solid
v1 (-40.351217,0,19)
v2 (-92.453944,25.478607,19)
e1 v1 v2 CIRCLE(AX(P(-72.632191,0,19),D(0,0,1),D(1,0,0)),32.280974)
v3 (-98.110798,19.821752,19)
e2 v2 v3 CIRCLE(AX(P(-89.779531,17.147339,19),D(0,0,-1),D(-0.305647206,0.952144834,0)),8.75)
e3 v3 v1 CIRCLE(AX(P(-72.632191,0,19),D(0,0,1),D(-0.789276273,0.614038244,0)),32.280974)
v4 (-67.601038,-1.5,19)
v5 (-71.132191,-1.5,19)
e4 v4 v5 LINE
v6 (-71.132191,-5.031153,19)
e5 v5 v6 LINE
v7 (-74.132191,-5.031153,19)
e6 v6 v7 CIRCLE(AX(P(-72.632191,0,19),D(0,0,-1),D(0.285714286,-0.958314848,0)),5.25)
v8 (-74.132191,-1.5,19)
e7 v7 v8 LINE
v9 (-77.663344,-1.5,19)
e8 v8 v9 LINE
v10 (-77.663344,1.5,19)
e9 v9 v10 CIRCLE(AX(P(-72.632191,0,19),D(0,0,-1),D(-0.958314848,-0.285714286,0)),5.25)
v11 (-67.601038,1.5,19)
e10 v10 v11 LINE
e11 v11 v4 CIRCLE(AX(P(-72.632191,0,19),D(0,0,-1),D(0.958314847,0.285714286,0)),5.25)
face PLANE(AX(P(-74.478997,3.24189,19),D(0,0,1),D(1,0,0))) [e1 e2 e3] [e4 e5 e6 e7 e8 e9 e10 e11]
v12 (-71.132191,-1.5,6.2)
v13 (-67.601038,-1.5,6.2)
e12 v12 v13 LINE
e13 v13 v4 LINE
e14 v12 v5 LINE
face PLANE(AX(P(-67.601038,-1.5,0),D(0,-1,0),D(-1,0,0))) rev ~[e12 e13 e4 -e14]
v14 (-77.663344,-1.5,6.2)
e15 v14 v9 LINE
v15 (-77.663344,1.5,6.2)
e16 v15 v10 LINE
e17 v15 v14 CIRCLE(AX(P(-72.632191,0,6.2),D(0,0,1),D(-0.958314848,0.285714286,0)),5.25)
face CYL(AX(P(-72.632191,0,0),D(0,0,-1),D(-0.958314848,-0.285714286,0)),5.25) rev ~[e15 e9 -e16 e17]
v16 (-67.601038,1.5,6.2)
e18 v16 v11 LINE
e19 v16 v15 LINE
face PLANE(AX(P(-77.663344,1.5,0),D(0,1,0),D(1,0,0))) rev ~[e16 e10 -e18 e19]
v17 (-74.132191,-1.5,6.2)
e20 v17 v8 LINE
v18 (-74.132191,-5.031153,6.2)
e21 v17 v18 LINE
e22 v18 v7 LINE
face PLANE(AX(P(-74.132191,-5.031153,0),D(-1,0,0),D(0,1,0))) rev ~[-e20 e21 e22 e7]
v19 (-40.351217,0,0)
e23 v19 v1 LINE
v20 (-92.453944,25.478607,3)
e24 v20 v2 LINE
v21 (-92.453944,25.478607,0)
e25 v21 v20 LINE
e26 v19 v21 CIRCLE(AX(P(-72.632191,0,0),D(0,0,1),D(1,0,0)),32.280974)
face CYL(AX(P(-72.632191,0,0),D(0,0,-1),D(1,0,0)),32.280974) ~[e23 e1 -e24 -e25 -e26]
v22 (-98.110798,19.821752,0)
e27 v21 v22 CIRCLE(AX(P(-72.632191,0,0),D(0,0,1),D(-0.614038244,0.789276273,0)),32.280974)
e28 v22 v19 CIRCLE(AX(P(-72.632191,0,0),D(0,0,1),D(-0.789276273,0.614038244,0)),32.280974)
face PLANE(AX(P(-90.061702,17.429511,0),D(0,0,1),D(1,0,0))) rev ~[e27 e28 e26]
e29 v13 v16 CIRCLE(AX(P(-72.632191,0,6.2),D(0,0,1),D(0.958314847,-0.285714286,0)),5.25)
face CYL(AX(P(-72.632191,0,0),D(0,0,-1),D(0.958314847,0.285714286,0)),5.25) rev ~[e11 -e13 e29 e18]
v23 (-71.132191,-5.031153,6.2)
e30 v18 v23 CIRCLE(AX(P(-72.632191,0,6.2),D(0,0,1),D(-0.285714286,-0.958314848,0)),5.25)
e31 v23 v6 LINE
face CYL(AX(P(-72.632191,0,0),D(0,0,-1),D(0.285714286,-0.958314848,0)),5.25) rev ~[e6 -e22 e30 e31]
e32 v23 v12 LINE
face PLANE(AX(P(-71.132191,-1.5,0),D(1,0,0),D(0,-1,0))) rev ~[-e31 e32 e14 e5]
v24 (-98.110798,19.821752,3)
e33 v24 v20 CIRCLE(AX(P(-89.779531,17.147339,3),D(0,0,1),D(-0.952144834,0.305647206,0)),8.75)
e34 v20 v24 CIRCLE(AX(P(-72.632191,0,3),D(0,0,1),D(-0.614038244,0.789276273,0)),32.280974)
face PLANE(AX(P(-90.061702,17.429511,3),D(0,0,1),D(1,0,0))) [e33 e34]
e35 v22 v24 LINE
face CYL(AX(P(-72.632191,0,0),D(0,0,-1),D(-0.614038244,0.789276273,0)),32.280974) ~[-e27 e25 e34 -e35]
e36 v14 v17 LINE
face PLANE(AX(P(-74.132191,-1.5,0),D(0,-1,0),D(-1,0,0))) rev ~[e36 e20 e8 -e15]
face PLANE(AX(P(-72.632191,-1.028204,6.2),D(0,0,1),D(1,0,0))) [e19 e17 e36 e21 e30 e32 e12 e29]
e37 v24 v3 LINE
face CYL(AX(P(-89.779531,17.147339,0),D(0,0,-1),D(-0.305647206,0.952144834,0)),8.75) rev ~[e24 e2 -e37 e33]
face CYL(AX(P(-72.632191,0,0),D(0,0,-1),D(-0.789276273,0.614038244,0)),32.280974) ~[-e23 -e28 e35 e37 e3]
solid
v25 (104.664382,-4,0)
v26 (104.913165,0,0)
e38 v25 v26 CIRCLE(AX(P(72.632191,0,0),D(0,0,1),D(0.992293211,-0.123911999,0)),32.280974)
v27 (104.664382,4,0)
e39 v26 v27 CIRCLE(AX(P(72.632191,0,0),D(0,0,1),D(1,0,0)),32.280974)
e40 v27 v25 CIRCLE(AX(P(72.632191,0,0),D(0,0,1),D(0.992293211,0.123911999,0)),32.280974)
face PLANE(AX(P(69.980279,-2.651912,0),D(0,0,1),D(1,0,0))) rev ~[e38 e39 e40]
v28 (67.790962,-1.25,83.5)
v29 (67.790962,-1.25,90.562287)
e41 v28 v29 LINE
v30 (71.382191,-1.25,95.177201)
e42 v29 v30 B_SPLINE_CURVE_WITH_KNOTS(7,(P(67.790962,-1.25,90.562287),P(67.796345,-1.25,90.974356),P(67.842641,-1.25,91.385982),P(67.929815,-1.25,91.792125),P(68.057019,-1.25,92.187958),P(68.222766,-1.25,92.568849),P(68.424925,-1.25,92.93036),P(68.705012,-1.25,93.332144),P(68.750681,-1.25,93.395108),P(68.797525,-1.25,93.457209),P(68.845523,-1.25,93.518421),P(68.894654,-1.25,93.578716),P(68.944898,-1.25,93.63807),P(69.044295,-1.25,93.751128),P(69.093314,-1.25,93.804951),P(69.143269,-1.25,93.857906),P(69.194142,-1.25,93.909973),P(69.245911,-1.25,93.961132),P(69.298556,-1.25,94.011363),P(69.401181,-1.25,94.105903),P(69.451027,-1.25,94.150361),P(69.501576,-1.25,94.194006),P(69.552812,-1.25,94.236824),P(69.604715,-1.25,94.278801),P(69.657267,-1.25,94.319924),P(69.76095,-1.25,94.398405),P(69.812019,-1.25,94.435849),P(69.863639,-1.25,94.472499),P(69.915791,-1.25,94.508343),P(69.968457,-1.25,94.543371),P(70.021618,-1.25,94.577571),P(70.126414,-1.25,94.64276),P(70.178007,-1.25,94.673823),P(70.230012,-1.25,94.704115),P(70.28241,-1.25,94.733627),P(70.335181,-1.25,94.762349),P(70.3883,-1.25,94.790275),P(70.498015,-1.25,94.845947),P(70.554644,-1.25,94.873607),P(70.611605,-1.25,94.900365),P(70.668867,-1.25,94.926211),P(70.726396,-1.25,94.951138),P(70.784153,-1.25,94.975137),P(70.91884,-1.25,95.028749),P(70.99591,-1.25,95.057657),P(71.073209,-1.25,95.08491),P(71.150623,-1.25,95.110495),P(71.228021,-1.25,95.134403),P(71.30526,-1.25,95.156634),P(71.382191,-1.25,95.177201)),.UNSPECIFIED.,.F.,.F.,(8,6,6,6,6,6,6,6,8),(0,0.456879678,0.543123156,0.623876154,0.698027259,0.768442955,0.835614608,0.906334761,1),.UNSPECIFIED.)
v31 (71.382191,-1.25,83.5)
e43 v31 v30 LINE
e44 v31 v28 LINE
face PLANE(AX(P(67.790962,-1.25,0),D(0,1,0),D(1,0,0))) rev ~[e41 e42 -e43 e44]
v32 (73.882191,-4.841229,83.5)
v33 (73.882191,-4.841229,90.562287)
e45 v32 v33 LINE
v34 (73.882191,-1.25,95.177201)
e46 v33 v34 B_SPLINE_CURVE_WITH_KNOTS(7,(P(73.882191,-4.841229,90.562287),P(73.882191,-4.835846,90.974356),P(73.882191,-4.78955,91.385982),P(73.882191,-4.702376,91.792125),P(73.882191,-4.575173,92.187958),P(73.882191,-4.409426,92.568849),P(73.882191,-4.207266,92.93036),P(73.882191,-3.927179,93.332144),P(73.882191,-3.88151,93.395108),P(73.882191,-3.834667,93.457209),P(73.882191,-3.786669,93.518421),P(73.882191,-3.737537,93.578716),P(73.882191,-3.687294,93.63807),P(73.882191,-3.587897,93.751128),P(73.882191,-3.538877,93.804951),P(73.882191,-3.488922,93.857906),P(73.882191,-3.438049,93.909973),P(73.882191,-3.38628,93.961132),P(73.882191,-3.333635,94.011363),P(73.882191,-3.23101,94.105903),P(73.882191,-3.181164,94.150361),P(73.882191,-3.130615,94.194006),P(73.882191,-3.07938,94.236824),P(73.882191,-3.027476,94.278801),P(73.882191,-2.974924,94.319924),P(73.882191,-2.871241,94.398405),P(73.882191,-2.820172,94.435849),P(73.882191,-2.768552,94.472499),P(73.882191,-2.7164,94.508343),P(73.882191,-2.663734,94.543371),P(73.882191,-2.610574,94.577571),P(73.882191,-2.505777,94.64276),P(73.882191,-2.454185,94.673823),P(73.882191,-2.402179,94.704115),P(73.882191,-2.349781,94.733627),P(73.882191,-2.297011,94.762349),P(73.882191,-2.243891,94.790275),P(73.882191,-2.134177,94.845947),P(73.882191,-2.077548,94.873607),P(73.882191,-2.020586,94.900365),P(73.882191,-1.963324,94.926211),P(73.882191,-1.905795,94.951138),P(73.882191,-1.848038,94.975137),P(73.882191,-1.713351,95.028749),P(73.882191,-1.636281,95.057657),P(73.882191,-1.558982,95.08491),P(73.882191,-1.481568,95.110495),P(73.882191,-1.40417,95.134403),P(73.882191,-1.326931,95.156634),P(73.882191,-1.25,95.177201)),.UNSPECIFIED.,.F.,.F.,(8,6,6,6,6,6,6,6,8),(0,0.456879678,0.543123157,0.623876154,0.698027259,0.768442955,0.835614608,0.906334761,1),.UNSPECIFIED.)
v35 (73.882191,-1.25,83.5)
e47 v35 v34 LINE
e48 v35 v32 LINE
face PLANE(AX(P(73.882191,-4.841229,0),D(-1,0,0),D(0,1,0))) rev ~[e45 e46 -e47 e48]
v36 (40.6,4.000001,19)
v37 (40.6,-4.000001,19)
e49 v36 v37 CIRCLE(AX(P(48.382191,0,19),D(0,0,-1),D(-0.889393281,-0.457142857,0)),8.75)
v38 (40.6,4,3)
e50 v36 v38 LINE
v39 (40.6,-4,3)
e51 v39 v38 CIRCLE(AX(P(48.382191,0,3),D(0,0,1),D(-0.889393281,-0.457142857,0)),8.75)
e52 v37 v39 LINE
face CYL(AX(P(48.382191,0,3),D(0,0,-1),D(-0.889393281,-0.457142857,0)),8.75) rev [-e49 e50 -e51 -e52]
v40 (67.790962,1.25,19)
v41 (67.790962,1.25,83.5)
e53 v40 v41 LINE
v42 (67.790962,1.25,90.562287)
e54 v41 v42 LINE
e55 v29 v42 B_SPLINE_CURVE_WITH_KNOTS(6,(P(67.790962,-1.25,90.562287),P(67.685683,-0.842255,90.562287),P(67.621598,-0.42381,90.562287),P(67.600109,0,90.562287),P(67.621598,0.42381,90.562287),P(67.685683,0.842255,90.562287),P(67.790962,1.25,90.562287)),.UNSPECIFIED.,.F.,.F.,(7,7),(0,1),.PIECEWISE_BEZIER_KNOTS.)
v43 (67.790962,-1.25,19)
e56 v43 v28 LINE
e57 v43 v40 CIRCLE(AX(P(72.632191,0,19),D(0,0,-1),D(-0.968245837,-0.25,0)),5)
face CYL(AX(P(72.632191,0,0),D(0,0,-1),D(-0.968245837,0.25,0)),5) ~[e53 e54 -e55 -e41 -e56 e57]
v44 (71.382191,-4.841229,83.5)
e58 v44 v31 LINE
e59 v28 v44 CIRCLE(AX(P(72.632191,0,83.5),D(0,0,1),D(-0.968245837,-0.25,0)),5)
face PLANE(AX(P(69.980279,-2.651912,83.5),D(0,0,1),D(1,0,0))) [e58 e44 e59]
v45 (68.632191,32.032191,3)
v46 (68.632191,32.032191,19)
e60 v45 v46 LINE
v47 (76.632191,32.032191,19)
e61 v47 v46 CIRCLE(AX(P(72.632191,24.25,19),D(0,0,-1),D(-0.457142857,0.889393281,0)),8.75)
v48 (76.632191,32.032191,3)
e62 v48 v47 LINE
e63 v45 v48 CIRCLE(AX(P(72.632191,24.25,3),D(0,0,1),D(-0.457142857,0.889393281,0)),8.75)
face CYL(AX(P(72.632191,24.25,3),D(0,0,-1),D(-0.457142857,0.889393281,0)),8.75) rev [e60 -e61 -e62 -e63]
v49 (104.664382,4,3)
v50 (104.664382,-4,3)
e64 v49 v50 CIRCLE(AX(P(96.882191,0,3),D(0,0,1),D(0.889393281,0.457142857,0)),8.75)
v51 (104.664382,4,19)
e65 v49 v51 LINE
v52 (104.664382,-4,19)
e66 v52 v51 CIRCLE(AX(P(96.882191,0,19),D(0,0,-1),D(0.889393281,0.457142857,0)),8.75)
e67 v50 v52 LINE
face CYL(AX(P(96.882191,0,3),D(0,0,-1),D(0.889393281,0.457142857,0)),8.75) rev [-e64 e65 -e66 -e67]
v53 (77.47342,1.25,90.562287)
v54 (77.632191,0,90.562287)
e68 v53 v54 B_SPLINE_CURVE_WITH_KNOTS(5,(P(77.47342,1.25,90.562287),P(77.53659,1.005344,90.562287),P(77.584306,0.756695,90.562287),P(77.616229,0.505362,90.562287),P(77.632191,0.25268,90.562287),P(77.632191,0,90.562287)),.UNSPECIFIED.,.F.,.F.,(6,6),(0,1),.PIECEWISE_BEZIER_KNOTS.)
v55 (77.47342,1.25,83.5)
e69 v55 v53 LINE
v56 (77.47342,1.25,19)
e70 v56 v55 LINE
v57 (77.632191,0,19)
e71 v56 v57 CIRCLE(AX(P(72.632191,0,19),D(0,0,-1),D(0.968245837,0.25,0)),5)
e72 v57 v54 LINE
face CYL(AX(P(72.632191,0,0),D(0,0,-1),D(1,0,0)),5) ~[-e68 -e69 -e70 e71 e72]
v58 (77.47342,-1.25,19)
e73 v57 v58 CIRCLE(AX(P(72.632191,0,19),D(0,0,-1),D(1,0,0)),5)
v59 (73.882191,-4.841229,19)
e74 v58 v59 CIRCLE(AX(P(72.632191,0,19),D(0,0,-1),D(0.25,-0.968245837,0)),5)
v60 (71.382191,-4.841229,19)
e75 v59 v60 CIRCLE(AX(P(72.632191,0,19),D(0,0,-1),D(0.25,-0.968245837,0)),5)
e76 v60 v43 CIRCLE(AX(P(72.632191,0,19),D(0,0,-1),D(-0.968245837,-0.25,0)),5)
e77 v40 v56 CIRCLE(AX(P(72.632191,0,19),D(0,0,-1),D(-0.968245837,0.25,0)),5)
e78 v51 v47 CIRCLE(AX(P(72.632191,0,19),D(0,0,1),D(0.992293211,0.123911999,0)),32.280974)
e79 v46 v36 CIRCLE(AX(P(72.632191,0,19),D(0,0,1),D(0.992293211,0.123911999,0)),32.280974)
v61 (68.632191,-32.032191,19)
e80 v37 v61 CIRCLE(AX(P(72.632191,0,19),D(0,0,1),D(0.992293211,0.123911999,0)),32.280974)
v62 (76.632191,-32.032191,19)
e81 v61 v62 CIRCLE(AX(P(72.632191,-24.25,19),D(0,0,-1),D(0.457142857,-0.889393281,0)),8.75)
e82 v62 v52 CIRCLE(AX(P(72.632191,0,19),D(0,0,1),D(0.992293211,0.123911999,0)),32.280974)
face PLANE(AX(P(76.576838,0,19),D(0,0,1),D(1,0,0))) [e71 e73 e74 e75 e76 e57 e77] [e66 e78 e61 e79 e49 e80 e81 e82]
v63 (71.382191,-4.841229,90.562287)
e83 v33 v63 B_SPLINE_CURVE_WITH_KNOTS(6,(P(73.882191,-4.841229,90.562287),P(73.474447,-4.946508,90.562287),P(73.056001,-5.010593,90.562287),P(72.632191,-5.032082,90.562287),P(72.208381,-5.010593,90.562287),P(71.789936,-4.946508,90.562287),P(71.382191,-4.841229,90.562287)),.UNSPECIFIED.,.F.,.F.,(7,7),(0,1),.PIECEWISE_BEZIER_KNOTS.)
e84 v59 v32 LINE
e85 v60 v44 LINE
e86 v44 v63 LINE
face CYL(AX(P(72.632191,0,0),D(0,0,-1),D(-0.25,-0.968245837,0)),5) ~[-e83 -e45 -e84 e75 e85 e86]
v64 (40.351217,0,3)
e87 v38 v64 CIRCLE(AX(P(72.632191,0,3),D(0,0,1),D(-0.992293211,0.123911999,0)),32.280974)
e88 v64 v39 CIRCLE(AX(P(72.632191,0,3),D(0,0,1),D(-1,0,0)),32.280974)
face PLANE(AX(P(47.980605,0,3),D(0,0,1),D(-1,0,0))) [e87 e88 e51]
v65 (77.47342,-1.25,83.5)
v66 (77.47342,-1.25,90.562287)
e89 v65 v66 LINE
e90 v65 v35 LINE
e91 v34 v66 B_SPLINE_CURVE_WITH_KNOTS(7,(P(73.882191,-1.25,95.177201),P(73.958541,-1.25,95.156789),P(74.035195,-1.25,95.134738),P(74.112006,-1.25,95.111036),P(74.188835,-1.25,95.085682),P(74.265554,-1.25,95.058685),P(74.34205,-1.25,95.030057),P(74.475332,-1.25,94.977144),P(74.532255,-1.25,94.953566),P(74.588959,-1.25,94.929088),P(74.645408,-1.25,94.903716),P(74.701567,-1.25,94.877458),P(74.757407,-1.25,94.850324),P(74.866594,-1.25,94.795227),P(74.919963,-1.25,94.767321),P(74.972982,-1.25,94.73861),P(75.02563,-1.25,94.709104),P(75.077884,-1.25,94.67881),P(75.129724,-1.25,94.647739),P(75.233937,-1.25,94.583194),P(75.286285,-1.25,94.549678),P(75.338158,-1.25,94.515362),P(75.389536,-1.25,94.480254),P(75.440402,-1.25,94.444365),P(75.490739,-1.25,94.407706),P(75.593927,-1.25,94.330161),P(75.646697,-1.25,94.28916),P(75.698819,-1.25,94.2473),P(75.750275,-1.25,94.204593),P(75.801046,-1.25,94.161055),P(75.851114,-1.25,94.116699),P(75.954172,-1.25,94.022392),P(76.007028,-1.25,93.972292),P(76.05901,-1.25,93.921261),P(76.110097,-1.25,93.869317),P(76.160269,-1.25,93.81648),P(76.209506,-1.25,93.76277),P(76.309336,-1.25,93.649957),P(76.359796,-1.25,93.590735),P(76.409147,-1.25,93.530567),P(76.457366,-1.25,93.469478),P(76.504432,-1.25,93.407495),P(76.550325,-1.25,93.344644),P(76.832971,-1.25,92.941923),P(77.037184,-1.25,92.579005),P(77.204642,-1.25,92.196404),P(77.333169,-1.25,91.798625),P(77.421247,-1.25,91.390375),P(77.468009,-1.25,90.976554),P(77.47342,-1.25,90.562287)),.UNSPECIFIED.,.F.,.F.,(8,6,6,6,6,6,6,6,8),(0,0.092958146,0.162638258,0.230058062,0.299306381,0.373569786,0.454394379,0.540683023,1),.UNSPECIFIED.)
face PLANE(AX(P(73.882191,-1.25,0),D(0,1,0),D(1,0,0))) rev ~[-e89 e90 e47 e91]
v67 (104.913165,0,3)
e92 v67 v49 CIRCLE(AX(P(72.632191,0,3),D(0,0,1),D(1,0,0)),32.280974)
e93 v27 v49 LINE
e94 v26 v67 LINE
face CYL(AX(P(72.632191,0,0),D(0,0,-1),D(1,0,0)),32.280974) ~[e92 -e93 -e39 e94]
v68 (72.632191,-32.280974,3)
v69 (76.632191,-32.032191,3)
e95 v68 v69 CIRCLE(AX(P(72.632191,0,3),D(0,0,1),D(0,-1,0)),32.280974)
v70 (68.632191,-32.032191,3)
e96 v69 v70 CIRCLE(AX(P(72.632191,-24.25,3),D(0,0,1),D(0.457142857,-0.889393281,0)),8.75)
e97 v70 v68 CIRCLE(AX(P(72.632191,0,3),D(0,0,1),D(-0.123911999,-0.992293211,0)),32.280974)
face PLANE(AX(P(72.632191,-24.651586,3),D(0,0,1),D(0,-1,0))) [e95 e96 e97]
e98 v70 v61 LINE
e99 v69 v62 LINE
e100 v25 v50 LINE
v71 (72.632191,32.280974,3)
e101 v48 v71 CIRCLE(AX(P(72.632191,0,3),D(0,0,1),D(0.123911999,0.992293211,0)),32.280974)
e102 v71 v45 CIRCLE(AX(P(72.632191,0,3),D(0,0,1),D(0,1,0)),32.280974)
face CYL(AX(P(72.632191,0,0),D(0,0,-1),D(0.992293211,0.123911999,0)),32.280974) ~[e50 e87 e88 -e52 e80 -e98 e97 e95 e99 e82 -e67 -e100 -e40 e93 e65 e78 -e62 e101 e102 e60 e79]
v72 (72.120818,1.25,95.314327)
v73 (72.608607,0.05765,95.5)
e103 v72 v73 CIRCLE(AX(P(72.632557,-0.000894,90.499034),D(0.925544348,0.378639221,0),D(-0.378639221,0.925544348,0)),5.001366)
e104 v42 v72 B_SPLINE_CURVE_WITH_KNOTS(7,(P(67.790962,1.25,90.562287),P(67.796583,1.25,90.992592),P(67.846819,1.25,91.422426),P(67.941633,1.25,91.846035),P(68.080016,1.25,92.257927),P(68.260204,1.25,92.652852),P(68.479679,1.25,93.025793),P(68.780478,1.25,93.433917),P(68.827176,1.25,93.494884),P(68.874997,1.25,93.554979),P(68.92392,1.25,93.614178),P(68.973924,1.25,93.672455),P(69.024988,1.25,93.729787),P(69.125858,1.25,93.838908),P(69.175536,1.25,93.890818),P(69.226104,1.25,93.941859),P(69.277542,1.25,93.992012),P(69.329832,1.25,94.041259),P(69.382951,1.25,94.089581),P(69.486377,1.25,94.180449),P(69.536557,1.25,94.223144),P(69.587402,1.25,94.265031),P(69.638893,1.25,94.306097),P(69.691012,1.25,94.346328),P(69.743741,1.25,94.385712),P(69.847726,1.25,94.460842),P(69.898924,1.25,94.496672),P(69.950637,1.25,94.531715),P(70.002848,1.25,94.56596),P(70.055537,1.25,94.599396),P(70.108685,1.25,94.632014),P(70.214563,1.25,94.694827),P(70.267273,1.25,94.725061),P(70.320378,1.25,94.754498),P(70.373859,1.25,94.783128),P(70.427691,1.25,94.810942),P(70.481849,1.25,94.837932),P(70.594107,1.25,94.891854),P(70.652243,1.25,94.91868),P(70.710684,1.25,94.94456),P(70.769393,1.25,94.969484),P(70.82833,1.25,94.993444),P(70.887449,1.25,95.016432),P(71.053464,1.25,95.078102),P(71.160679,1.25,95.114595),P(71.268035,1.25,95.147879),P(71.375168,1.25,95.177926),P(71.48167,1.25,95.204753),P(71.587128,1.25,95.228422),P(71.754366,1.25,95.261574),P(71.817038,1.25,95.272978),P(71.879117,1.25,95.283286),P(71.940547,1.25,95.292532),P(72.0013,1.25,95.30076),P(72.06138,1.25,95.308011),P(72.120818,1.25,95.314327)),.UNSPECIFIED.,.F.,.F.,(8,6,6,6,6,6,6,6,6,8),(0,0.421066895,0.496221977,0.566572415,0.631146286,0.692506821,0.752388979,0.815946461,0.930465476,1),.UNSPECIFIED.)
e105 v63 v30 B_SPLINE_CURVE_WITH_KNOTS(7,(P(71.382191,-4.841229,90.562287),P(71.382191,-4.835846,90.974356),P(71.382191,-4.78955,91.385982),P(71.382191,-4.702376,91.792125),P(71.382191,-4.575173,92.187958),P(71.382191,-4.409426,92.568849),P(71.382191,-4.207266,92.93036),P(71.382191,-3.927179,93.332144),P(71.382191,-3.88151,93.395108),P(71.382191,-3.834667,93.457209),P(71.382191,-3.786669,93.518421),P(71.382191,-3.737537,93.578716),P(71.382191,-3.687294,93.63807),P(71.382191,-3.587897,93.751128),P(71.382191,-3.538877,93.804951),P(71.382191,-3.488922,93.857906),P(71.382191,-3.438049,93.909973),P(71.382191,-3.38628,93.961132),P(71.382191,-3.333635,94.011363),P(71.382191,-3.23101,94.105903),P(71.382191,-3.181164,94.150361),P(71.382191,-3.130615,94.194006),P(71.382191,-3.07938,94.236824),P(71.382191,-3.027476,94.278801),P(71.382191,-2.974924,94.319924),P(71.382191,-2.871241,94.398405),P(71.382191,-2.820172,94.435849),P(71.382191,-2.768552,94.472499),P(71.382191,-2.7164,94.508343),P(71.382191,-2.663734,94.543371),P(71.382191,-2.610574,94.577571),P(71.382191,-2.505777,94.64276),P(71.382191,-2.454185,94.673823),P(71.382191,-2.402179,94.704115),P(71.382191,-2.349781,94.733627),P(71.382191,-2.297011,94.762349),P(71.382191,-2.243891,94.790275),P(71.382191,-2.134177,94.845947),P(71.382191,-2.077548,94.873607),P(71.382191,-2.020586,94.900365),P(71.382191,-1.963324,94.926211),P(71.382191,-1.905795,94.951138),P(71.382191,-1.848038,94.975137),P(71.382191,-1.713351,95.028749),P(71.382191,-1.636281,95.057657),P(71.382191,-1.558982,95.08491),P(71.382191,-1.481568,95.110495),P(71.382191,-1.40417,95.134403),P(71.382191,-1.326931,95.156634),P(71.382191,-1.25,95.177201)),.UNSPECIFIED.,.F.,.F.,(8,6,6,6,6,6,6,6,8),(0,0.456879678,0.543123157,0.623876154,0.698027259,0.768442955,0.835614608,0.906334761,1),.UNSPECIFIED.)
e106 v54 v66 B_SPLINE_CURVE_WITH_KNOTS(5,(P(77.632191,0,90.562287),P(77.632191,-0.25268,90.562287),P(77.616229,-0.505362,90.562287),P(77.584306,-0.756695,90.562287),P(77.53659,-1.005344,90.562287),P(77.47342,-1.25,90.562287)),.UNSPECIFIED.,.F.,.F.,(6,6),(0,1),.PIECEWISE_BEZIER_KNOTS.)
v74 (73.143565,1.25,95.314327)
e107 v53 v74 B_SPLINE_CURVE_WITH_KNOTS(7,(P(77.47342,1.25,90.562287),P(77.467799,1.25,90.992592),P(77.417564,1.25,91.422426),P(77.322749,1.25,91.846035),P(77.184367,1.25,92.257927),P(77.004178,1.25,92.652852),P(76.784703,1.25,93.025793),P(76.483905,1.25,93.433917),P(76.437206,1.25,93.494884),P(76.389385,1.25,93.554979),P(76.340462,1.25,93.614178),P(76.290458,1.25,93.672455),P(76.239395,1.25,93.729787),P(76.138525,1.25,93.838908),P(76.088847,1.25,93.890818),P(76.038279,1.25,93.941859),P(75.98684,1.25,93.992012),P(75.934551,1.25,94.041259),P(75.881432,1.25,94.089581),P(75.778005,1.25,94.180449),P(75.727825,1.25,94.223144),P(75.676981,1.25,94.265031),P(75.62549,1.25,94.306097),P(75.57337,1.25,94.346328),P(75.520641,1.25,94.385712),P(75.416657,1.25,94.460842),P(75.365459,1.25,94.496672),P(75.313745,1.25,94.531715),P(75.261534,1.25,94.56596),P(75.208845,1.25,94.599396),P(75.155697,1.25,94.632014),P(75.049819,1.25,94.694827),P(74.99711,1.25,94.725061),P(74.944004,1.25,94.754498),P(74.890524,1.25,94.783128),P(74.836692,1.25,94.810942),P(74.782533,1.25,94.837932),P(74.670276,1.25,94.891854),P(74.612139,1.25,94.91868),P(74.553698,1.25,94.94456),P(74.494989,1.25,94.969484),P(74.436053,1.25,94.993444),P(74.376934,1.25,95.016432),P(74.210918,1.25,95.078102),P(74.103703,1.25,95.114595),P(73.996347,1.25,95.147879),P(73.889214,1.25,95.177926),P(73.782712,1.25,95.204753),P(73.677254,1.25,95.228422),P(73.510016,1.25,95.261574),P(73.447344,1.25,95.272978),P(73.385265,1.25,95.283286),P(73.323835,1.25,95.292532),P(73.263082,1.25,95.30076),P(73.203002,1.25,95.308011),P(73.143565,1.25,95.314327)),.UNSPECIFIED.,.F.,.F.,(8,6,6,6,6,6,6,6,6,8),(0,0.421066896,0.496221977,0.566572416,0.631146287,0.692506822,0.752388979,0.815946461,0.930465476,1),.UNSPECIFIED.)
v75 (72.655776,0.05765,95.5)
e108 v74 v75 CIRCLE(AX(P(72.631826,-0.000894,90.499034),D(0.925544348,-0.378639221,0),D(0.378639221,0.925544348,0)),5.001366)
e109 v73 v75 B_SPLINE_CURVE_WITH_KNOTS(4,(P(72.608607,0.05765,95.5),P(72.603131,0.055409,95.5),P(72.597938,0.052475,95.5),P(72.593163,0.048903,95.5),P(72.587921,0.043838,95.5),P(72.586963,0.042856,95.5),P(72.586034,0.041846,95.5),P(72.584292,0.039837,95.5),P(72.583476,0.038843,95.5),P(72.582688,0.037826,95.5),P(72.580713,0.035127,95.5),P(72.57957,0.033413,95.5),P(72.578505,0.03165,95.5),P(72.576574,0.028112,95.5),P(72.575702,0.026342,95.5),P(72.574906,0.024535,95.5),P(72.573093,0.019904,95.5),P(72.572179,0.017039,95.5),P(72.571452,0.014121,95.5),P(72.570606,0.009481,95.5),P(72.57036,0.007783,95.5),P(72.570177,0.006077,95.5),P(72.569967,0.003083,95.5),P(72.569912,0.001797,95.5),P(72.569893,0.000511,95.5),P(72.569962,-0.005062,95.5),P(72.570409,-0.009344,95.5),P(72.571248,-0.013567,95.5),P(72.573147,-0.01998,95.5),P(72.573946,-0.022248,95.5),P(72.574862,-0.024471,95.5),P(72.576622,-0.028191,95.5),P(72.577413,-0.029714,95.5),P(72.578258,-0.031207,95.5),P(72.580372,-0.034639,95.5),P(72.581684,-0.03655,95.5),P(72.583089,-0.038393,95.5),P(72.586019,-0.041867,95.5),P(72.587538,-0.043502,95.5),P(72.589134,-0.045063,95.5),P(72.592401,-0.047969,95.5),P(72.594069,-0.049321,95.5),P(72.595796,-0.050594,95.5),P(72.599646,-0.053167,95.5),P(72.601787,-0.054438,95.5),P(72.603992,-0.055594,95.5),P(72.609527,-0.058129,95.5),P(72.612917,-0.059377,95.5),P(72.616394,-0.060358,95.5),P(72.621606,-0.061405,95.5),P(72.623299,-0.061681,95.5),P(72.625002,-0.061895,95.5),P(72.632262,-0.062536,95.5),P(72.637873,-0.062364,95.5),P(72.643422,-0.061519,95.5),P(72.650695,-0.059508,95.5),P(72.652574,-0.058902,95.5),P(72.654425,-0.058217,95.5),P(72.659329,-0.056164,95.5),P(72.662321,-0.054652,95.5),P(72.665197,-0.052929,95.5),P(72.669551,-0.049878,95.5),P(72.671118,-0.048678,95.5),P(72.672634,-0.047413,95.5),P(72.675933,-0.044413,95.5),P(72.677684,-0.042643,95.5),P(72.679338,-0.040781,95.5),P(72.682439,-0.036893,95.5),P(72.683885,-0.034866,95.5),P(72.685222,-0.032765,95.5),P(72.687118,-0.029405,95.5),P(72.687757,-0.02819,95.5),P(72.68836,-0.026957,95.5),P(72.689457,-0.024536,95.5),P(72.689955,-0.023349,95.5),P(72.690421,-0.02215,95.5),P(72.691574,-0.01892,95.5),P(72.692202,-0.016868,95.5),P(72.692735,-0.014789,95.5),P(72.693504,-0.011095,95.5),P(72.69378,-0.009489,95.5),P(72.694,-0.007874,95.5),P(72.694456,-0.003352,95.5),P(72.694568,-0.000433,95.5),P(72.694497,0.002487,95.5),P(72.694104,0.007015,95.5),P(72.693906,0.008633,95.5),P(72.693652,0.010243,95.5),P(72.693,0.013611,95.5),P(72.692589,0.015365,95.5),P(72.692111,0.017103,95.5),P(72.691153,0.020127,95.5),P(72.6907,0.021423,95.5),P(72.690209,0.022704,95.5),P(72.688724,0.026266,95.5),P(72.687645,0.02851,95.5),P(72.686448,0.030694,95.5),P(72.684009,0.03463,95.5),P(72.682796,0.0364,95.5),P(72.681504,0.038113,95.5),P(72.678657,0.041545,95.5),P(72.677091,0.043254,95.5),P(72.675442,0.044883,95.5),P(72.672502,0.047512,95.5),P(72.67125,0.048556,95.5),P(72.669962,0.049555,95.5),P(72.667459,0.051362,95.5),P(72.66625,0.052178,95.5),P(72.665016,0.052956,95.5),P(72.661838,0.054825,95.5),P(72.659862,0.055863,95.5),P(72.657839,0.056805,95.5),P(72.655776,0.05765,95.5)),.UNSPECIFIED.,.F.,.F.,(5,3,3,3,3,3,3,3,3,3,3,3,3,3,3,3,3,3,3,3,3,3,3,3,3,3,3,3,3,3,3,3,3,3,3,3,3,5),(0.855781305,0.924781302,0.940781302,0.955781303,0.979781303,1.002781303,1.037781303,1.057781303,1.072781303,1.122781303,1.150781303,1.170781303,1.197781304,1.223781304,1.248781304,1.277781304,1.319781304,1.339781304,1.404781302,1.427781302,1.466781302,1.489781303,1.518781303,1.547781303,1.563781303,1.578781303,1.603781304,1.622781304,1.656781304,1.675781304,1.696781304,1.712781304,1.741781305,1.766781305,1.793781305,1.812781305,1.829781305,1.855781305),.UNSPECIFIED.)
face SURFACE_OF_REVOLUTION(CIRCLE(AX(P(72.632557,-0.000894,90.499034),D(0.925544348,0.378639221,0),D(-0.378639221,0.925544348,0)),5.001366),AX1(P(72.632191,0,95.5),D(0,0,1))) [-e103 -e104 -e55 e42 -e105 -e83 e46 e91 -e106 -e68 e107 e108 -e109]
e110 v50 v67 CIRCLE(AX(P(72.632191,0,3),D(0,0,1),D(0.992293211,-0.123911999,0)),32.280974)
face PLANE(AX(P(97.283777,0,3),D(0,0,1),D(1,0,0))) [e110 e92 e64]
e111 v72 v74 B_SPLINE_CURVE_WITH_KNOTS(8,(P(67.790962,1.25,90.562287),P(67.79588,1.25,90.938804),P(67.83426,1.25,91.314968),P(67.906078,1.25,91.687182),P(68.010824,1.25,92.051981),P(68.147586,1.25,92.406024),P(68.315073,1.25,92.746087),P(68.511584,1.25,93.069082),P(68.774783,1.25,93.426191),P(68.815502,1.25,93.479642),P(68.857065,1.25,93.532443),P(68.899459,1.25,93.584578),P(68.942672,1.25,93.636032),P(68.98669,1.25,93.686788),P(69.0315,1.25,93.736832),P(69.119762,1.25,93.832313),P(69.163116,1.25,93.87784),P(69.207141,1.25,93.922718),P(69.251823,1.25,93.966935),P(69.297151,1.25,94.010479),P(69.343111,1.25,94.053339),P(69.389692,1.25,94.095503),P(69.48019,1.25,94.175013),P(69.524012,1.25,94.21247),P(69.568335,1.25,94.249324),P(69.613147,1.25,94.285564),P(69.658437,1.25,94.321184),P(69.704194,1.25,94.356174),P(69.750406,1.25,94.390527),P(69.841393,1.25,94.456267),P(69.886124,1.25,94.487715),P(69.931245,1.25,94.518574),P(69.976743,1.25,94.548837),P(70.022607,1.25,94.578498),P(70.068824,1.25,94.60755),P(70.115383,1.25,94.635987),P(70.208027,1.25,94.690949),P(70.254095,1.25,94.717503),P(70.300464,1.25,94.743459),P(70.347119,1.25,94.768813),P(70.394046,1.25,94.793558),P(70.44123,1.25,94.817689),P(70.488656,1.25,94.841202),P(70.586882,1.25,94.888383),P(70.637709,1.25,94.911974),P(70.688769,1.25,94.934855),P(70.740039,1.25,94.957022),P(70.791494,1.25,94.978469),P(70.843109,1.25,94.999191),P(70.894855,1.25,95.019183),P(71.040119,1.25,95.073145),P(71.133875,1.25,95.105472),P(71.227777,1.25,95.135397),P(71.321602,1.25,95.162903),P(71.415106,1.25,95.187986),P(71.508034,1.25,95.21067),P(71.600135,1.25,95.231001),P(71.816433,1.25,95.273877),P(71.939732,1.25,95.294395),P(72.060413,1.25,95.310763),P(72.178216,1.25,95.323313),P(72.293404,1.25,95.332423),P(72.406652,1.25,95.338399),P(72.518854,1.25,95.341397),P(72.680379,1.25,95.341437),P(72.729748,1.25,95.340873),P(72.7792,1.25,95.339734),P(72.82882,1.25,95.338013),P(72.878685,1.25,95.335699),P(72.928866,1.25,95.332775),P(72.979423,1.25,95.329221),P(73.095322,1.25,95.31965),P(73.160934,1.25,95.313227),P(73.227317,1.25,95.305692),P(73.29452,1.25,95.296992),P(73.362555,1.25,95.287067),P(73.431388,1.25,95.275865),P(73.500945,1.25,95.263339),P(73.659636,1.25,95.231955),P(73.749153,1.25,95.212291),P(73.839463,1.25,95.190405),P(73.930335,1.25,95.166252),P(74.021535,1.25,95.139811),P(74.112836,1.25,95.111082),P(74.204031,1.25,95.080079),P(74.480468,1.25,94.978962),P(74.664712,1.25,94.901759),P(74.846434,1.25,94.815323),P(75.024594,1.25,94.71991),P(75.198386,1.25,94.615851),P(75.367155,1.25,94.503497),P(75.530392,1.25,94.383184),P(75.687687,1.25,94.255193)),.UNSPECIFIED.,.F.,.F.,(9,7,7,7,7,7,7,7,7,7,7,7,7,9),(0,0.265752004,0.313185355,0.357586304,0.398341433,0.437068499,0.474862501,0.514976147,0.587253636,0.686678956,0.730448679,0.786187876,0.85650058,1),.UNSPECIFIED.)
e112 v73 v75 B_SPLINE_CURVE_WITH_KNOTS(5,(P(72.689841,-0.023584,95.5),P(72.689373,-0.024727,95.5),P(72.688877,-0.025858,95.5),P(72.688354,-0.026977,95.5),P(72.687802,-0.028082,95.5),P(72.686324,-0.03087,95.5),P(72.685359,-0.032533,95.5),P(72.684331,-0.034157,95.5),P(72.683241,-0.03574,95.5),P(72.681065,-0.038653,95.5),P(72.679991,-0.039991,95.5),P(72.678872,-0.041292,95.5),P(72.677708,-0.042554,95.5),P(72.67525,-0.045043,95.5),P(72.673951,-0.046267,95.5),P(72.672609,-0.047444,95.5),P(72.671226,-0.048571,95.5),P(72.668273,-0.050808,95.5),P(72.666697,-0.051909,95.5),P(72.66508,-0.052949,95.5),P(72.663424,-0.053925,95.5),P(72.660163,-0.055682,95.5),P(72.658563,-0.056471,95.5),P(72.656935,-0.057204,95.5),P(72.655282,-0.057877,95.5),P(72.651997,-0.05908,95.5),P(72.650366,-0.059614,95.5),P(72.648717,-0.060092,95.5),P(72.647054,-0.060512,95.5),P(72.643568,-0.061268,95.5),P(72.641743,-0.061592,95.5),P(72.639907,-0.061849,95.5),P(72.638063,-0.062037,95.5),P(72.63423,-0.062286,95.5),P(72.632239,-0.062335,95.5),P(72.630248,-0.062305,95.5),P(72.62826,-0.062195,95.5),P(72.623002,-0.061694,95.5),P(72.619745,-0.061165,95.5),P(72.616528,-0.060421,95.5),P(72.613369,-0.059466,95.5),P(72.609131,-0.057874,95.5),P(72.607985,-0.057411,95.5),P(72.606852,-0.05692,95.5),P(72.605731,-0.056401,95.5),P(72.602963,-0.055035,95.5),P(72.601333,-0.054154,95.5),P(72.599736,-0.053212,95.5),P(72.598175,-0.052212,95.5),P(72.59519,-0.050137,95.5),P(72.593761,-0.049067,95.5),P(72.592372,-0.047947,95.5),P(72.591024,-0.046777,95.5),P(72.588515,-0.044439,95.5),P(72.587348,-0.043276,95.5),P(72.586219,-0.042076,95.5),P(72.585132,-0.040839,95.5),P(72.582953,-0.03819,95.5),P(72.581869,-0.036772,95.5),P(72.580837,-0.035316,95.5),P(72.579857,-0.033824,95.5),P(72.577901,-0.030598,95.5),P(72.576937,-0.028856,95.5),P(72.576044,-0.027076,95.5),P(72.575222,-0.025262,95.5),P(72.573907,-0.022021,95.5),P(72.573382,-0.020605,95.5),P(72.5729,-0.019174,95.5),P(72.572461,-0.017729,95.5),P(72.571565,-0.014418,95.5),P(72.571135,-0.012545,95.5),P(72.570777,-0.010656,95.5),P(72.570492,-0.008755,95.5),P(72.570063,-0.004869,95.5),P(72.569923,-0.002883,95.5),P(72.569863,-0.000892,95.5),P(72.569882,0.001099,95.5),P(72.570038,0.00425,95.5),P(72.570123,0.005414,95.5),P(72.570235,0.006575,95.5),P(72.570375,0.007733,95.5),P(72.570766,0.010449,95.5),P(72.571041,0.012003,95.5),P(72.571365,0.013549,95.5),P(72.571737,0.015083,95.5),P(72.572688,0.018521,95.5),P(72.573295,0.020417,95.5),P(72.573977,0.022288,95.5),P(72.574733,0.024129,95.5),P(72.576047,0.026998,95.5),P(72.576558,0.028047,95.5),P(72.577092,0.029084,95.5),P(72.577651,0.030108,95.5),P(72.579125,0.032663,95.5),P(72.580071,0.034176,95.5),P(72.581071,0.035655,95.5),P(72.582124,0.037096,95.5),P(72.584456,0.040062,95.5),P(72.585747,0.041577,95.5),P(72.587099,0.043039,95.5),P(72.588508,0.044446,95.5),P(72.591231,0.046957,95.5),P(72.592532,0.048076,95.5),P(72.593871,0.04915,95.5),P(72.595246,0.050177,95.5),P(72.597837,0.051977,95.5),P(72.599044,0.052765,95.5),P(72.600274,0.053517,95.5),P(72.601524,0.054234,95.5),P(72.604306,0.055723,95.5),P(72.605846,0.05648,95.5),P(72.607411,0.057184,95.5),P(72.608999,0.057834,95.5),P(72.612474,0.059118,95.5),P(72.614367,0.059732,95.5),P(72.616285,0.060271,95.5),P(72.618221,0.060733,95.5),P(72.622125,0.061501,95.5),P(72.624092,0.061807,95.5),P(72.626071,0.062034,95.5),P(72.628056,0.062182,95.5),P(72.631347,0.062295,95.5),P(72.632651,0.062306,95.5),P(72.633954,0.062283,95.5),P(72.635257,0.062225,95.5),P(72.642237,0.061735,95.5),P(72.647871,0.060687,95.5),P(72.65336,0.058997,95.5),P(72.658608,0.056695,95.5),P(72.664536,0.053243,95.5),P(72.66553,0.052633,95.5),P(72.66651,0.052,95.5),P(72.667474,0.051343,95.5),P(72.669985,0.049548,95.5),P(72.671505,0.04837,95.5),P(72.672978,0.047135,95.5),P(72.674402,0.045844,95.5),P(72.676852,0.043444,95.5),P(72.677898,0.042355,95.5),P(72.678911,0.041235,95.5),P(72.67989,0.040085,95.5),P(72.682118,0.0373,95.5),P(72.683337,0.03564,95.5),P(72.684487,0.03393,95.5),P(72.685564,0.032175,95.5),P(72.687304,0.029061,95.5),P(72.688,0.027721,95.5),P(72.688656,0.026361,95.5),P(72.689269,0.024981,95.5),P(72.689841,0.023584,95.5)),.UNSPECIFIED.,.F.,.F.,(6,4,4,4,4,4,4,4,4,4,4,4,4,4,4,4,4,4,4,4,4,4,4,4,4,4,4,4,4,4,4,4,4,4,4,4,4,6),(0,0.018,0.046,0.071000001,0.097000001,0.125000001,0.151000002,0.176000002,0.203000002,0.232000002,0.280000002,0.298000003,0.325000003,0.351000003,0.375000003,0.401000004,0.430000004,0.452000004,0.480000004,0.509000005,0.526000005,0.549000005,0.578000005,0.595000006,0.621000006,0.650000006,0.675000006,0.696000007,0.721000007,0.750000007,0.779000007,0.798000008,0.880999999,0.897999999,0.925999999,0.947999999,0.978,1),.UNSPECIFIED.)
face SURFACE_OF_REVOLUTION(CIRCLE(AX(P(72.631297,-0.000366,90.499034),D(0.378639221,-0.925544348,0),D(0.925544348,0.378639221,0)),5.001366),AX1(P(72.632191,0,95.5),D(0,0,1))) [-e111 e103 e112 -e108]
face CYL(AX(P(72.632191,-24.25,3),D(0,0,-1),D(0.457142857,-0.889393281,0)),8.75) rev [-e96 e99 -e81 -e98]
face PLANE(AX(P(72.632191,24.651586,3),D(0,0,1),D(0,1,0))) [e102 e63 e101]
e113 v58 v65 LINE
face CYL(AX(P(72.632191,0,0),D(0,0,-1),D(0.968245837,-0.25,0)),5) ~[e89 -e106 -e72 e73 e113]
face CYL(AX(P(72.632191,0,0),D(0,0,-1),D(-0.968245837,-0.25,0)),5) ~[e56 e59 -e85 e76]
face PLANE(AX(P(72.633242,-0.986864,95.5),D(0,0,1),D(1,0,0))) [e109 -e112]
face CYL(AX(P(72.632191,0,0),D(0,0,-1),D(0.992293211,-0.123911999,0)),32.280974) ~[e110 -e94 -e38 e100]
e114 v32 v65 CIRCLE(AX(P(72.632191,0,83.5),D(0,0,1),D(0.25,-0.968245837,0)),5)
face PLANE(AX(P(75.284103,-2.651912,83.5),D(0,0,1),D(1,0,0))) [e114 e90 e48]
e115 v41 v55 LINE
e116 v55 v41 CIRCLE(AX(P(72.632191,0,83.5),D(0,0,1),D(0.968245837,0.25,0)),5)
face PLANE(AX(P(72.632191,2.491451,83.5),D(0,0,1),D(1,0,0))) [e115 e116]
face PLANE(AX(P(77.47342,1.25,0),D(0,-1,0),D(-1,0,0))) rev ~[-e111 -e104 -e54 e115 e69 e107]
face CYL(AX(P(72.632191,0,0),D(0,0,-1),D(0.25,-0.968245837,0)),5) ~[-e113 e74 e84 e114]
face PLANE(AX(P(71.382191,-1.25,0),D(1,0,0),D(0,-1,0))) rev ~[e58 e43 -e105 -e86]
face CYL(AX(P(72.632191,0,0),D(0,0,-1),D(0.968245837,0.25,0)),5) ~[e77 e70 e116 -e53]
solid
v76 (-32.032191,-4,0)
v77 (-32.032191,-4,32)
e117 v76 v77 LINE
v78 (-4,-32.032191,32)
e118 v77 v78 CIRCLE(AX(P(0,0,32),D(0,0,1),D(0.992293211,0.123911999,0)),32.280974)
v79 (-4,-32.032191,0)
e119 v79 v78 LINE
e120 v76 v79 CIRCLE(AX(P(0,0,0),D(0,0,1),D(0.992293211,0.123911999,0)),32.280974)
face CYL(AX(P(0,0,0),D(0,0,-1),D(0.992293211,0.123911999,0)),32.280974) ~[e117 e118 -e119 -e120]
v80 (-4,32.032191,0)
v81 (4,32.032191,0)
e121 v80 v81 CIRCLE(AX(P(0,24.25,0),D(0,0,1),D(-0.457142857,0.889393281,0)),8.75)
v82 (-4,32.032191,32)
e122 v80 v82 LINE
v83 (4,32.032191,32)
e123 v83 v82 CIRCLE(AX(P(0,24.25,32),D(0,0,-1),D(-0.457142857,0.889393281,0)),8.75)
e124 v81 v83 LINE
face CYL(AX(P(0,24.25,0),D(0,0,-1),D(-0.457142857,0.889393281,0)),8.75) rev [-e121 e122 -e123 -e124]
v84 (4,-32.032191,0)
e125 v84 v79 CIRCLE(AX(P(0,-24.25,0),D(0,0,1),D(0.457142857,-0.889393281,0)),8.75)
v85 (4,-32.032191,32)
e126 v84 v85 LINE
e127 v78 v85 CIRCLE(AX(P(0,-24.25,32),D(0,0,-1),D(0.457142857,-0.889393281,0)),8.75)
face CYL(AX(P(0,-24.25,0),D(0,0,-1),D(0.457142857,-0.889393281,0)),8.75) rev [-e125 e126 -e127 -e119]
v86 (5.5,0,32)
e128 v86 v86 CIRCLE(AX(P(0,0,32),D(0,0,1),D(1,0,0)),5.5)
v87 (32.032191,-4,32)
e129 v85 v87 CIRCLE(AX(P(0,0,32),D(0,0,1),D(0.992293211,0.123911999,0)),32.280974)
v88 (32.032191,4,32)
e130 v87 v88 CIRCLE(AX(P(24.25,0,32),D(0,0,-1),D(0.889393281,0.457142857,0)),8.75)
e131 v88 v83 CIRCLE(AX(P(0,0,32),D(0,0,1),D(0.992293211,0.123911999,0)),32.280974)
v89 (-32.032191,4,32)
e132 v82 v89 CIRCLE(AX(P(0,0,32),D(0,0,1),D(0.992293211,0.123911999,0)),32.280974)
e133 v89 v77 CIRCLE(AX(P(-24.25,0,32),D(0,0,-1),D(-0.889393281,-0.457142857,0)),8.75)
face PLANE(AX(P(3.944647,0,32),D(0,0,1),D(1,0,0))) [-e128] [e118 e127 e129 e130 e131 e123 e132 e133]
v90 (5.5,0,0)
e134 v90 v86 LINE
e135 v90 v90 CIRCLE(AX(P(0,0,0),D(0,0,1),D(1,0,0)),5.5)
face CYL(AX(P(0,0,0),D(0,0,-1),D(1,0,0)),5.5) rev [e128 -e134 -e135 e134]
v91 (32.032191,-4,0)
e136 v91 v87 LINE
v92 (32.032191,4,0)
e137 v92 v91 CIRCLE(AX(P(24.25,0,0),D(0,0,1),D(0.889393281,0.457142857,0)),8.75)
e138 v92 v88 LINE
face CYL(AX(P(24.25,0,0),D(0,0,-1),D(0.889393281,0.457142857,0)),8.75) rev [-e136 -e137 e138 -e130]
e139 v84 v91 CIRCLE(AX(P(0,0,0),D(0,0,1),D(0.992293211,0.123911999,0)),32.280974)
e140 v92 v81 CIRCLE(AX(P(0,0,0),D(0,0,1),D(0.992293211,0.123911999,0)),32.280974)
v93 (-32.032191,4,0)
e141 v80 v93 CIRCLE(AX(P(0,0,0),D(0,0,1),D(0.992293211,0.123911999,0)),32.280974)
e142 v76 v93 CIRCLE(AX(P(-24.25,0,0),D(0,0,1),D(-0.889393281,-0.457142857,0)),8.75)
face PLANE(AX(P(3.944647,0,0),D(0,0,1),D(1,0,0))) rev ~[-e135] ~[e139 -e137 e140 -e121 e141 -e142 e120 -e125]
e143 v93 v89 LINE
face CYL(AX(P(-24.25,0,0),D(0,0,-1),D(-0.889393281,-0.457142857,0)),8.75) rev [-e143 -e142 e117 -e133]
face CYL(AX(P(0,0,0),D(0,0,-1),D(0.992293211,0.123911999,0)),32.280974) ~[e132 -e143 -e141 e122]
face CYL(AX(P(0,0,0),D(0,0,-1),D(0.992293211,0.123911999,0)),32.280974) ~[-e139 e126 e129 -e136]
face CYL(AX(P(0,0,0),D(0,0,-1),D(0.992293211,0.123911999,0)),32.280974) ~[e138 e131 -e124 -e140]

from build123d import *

# Parameters (mm, degrees)
F3_R             = 5.5
F6_DEPTH         = 32
F7_DEPTH         = 32.001
F7_COPIES_COUNT  = 4
F8_DEPTH         = 19
F9_DEPTH         = 95.5
F10_DEPTH        = 83.5
F11_T2_ANGLE     = 315.5011633423
F11_T4_ANGLE     = 315.5011633423
F11_T6_ANGLE     = 315.5011633423
F12_START        = 3
F12_DEPTH        = 92.5010001001
F12_COPIES_COUNT = 4
F13_START        = 3
F13_DEPTH        = 92.5010001001
F14_DEPTH        = 19
F15_DEPTH        = 6.2
F16_DEPTH        = 3


# Not quite as in the source:
# - a fillet or chamfer that OpenCascade refuses, or shapes differently, is made with other operations: its cross-section is extruded or revolved along the edge and cut away or added
# - a pattern or mirror of a feature is missing from the dataset's text; its kind, count and spacing are read off the source's solid
# - a feature names something its author has since deleted; it is built from what else it names


with BuildPart() as f6:
    # F3 (on Top) → F6 (new body)
    with BuildSketch(Plane.XY):
        with BuildLine():
            ThreePointArc((32.0321912081, -4), (15.5, 0), (32.0321912081, 4))
            ThreePointArc((32.0321912081, 4), (-32.2809738638, 0), (32.0321912081, -4))
        make_face()
        Circle(F3_R, mode=Mode.SUBTRACT)
        with BuildLine():
            ThreePointArc((32.2809738638, 0), (32.218718168, 2.0038645669), (32.0321912081, 4))
            ThreePointArc((32.0321912081, 4), (15.5, 0), (32.0321912081, -4))
            ThreePointArc((32.0321912081, -4), (32.218718168, -2.0038645669), (32.2809738638, 0))
        make_face()
    extrude(amount=F6_DEPTH)

    # F3 (on Top) → F7 (cut, through all)
    with BuildSketch(Plane.XY):
        with BuildLine():
            ThreePointArc((32.2809738638, 0), (32.218718168, 2.0038645669), (32.0321912081, 4))
            ThreePointArc((32.0321912081, 4), (15.5, 0), (32.0321912081, -4))
            ThreePointArc((32.0321912081, -4), (32.218718168, -2.0038645669), (32.2809738638, 0))
        make_face()
    f7 = extrude(amount=F7_DEPTH, mode=Mode.SUBTRACT)

    # F7_copies: F7 ×4 about axis
    f7_copies_axis = Axis((0, 0, 0), (0, 0, 1))
    for i in range(1, F7_COPIES_COUNT):
        add(f7.rotate(f7_copies_axis, i * 360 / F7_COPIES_COUNT), mode=Mode.SUBTRACT)

    # F3 (on Top) → F13 (cut)
    with BuildSketch(Plane.XY.offset(F13_START)):
        with BuildLine():
            ThreePointArc((104.6643824017, -4), (104.8509093616, -2.0038645669), (104.9131650573, 0))
            ThreePointArc((104.9131650573, 0), (104.8509093616, 2.0038645669), (104.6643824017, 4))
            ThreePointArc((104.6643824017, 4), (88.1321911935, 0), (104.6643824017, -4))
        make_face()
    extrude(amount=F13_DEPTH, mode=Mode.SUBTRACT)


with BuildPart() as f8:
    # F3 (on Top) → F8 (new body)
    with BuildSketch(Plane.XY):
        with BuildLine():
            ThreePointArc((104.6643824017, -4), (88.1321911935, 0), (104.6643824017, 4))
            ThreePointArc((104.6643824017, 4), (40.3512173297, 0), (104.6643824017, -4))
        make_face()
        with BuildLine():
            ThreePointArc((77.4734203763, 1.25), (77.5923396749, 0.6300214624), (77.6321911935, 0))
            ThreePointArc((77.6321911935, 0), (77.5923396749, -0.6300214624), (77.4734203763, -1.25))
            ThreePointArc((77.4734203763, -1.25), (76.1677250995, -3.5355339059), (73.8821911935, -4.8412291828))
            ThreePointArc((73.8821911935, -4.8412291828), (72.6321911935, -5), (71.3821911935, -4.8412291828))
            ThreePointArc((71.3821911935, -4.8412291828), (69.0966572876, -3.5355339059), (67.7909620108, -1.25))
            ThreePointArc((67.7909620108, -1.25), (67.6321911935, 0), (67.7909620108, 1.25))
            ThreePointArc((67.7909620108, 1.25), (72.6321911935, 5), (77.4734203763, 1.25))
        make_face(mode=Mode.SUBTRACT)
        with BuildLine():
            ThreePointArc((73.8821911935, -4.8412291828), (76.1677250995, -3.5355339059), (77.4734203763, -1.25))
            Line((77.4734203763, -1.25), (73.8821911935, -1.25))
            Line((73.8821911935, -1.25), (73.8821911935, -4.8412291828))
        make_face()
        with BuildLine():
            Line((71.3821911935, -1.25), (67.7909620108, -1.25))
            ThreePointArc((67.7909620108, -1.25), (69.0966572876, -3.5355339059), (71.3821911935, -4.8412291828))
            Line((71.3821911935, -4.8412291828), (71.3821911935, -1.25))
        make_face()
        with BuildLine():
            ThreePointArc((104.6643824017, -4), (104.8509093616, -2.0038645669), (104.9131650573, 0))
            ThreePointArc((104.9131650573, 0), (104.8509093616, 2.0038645669), (104.6643824017, 4))
            ThreePointArc((104.6643824017, 4), (88.1321911935, 0), (104.6643824017, -4))
        make_face()
    extrude(amount=F8_DEPTH)

    # F3 (on Top) → F9 (join)
    with BuildSketch(Plane.XY):
        with BuildLine():
            ThreePointArc((77.4734203763, -1.25), (77.5923396749, -0.6300214624), (77.6321911935, 0))
            ThreePointArc((77.6321911935, 0), (77.5923396749, 0.6300214624), (77.4734203763, 1.25))
            Line((77.4734203763, 1.25), (67.7909620108, 1.25))
            ThreePointArc((67.7909620108, 1.25), (67.6321911935, 0), (67.7909620108, -1.25))
            Line((67.7909620108, -1.25), (71.3821911935, -1.25))
            Line((71.3821911935, -1.25), (71.3821911935, -4.8412291828))
            ThreePointArc((71.3821911935, -4.8412291828), (72.6321911935, -5), (73.8821911935, -4.8412291828))
            Line((73.8821911935, -4.8412291828), (73.8821911935, -1.25))
            Line((73.8821911935, -1.25), (77.4734203763, -1.25))
        make_face()
    extrude(amount=F9_DEPTH)

    # F3 (on Top) → F10 (join)
    with BuildSketch(Plane.XY):
        with BuildLine():
            Line((71.3821911935, -1.25), (67.7909620108, -1.25))
            ThreePointArc((67.7909620108, -1.25), (69.0966572876, -3.5355339059), (71.3821911935, -4.8412291828))
            Line((71.3821911935, -4.8412291828), (71.3821911935, -1.25))
        make_face()
        with BuildLine():
            ThreePointArc((73.8821911935, -4.8412291828), (76.1677250995, -3.5355339059), (77.4734203763, -1.25))
            Line((77.4734203763, -1.25), (73.8821911935, -1.25))
            Line((73.8821911935, -1.25), (73.8821911935, -4.8412291828))
        make_face()
        with BuildLine():
            Line((67.7909620108, 1.25), (77.4734203763, 1.25))
            ThreePointArc((77.4734203763, 1.25), (72.6321911935, 5), (67.7909620108, 1.25))
        make_face()
    extrude(amount=F10_DEPTH)

    # F11: fillet of radius 5 on 3 edges, made by hand

    # F11_s1 → F11_t2 (revolve, cut)
    with BuildSketch(Plane(origin=(62.2190839151, 25.4537619139, 0), x_dir=(0, 0, 1), z_dir=(0.925544348, 0.3786392212, 0))):
        with BuildLine():
            ThreePointArc((90.4990343146, 22.5009963057), (94.0351924681, 23.9655209949), (95.5003999068, 27.5013963057))
            Line((95.5003999068, 27.5013963057), (96.0005364913, 27.5013963057))
            Line((96.0005364913, 27.5013963057), (96.0001365685, 22.5013963057))
            Line((96.0001365685, 22.5013963057), (95.5, 22.0012597372))
            ThreePointArc((95.5, 22.0012597372), (92.9995171573, 22.0012597372), (90.4990343146, 22.0008597372))
            Line((90.4990343146, 22.0008597372), (90.4990343146, 22.5009963057))
        make_face()
    revolve(axis=Axis((72.6321911935, 0, 95.5), (0, 0, 1)), revolution_arc=F11_T2_ANGLE, mode=Mode.SUBTRACT)

    # F11_s3 → F11_t4 (revolve, cut)
    with BuildSketch(Plane(origin=(10.4131072784, -25.453761914, 0), x_dir=(0, 0, 1), z_dir=(0.3786392212, -0.925544348, 0))):
        with BuildLine():
            ThreePointArc((90.4990343146, -72.2247140449), (94.0351924681, -70.7601893557), (95.5003999068, -67.2243140449))
            Line((95.5003999068, -67.2243140449), (96.0005364913, -67.2243140449))
            Line((96.0005364913, -67.2243140449), (96.0001365685, -72.2243140449))
            Line((96.0001365685, -72.2243140449), (95.5, -72.7244506135))
            ThreePointArc((95.5, -72.7244506135), (92.9995171573, -72.7244506135), (90.4990343146, -72.7248506135))
            Line((90.4990343146, -72.7248506135), (90.4990343146, -72.2247140449))
        make_face()
    revolve(axis=Axis((72.6321911935, 0, 95.5), (0, 0, 1)), revolution_arc=F11_T4_ANGLE, mode=Mode.SUBTRACT)

    # F11_s5 → F11_t6 (revolve, cut)
    with BuildSketch(Plane(origin=(10.4131072784, 25.453761914, 0), x_dir=(0, 0, 1), z_dir=(-0.3786392212, -0.925544348, 0))):
        with BuildLine():
            ThreePointArc((90.4990343146, -62.2239140449), (94.0351924681, -63.6884387341), (95.5003999068, -67.2243140449))
            Line((95.5003999068, -67.2243140449), (96.0005364913, -67.2243140449))
            Line((96.0005364913, -67.2243140449), (96.0001365685, -62.2243140449))
            Line((96.0001365685, -62.2243140449), (95.5, -61.7241774764))
            ThreePointArc((95.5, -61.7241774764), (92.9995171573, -61.7241774764), (90.4990343146, -61.7237774764))
            Line((90.4990343146, -61.7237774764), (90.4990343146, -62.2239140449))
        make_face()
    revolve(axis=Axis((72.6321911935, 0, 95.5), (0, 0, -1)), revolution_arc=F11_T6_ANGLE, mode=Mode.SUBTRACT)

    # F3 (on Top) → F12 (cut)
    with BuildSketch(Plane.XY.offset(F12_START)):
        with BuildLine():
            ThreePointArc((104.6643824017, -4), (104.8509093616, -2.0038645669), (104.9131650573, 0))
            ThreePointArc((104.9131650573, 0), (104.8509093616, 2.0038645669), (104.6643824017, 4))
            ThreePointArc((104.6643824017, 4), (88.1321911935, 0), (104.6643824017, -4))
        make_face()
    f12 = extrude(amount=F12_DEPTH, mode=Mode.SUBTRACT)

    # F12_copies: F12 ×4 about axis
    f12_copies_axis = Axis((72.632191, 0, 0), (0, 0, 1))
    for i in range(1, F12_COPIES_COUNT):
        add(f12.rotate(f12_copies_axis, i * 360 / F12_COPIES_COUNT), mode=Mode.SUBTRACT)


with BuildPart() as f14:
    # F3 (on Top) → F14 (new body)
    with BuildSketch(Plane.XY):
        with BuildLine():
            ThreePointArc((-98.1107979378, 19.8217524948), (-83.1104313892, -30.5330600497), (-40.3512173297, 0))
            ThreePointArc((-40.3512173297, 0), (-58.4512920793, 28.9993685088), (-92.4539436883, 25.4786067443))
            ThreePointArc((-92.4539436883, 25.4786067443), (-83.5923463019, 10.9601551084), (-98.1107979378, 19.8217524948))
        make_face()
        with BuildLine():
            Line((-71.1321911935, 1.5), (-67.6010382442, 1.5))
            ThreePointArc((-67.6010382442, 1.5), (-67.3821911935, 0), (-67.6010382442, -1.5))
            Line((-67.6010382442, -1.5), (-71.1321911935, -1.5))
            Line((-71.1321911935, -1.5), (-71.1321911935, -5.0311529494))
            ThreePointArc((-71.1321911935, -5.0311529494), (-72.6321911935, -5.25), (-74.1321911935, -5.0311529494))
            Line((-74.1321911935, -5.0311529494), (-74.1321911935, -1.5))
            Line((-74.1321911935, -1.5), (-77.6633441429, -1.5))
            ThreePointArc((-77.6633441429, -1.5), (-77.8821911935, 0), (-77.6633441429, 1.5))
            Line((-77.6633441429, 1.5), (-74.1321911935, 1.5))
            Line((-74.1321911935, 1.5), (-71.1321911935, 1.5))
        make_face(mode=Mode.SUBTRACT)
    extrude(amount=F14_DEPTH)

    # F3 (on Top) → F15 (join)
    with BuildSketch(Plane.XY):
        with BuildLine():
            ThreePointArc((-67.6010382442, -1.5), (-67.3821911935, 0), (-67.6010382442, 1.5))
            Line((-67.6010382442, 1.5), (-71.1321911935, 1.5))
            Line((-71.1321911935, 1.5), (-74.1321911935, 1.5))
            Line((-74.1321911935, 1.5), (-77.6633441429, 1.5))
            ThreePointArc((-77.6633441429, 1.5), (-77.8821911935, 0), (-77.6633441429, -1.5))
            Line((-77.6633441429, -1.5), (-74.1321911935, -1.5))
            Line((-74.1321911935, -1.5), (-74.1321911935, -5.0311529494))
            ThreePointArc((-74.1321911935, -5.0311529494), (-72.6321911935, -5.25), (-71.1321911935, -5.0311529494))
            Line((-71.1321911935, -5.0311529494), (-71.1321911935, -1.5))
            Line((-71.1321911935, -1.5), (-67.6010382442, -1.5))
        make_face()
    extrude(amount=F15_DEPTH)

    # F3 (on Top) → F16 (join)
    with BuildSketch(Plane.XY):
        with BuildLine():
            ThreePointArc((-98.1107979378, 19.8217524948), (-83.5923463019, 10.9601551084), (-92.4539436883, 25.4786067443))
            ThreePointArc((-92.4539436883, 25.4786067443), (-95.4582867159, 22.8260955224), (-98.1107979378, 19.8217524948))
        make_face()
    extrude(amount=F16_DEPTH)


solid = Compound([f6.part, f8.part, f14.part])
